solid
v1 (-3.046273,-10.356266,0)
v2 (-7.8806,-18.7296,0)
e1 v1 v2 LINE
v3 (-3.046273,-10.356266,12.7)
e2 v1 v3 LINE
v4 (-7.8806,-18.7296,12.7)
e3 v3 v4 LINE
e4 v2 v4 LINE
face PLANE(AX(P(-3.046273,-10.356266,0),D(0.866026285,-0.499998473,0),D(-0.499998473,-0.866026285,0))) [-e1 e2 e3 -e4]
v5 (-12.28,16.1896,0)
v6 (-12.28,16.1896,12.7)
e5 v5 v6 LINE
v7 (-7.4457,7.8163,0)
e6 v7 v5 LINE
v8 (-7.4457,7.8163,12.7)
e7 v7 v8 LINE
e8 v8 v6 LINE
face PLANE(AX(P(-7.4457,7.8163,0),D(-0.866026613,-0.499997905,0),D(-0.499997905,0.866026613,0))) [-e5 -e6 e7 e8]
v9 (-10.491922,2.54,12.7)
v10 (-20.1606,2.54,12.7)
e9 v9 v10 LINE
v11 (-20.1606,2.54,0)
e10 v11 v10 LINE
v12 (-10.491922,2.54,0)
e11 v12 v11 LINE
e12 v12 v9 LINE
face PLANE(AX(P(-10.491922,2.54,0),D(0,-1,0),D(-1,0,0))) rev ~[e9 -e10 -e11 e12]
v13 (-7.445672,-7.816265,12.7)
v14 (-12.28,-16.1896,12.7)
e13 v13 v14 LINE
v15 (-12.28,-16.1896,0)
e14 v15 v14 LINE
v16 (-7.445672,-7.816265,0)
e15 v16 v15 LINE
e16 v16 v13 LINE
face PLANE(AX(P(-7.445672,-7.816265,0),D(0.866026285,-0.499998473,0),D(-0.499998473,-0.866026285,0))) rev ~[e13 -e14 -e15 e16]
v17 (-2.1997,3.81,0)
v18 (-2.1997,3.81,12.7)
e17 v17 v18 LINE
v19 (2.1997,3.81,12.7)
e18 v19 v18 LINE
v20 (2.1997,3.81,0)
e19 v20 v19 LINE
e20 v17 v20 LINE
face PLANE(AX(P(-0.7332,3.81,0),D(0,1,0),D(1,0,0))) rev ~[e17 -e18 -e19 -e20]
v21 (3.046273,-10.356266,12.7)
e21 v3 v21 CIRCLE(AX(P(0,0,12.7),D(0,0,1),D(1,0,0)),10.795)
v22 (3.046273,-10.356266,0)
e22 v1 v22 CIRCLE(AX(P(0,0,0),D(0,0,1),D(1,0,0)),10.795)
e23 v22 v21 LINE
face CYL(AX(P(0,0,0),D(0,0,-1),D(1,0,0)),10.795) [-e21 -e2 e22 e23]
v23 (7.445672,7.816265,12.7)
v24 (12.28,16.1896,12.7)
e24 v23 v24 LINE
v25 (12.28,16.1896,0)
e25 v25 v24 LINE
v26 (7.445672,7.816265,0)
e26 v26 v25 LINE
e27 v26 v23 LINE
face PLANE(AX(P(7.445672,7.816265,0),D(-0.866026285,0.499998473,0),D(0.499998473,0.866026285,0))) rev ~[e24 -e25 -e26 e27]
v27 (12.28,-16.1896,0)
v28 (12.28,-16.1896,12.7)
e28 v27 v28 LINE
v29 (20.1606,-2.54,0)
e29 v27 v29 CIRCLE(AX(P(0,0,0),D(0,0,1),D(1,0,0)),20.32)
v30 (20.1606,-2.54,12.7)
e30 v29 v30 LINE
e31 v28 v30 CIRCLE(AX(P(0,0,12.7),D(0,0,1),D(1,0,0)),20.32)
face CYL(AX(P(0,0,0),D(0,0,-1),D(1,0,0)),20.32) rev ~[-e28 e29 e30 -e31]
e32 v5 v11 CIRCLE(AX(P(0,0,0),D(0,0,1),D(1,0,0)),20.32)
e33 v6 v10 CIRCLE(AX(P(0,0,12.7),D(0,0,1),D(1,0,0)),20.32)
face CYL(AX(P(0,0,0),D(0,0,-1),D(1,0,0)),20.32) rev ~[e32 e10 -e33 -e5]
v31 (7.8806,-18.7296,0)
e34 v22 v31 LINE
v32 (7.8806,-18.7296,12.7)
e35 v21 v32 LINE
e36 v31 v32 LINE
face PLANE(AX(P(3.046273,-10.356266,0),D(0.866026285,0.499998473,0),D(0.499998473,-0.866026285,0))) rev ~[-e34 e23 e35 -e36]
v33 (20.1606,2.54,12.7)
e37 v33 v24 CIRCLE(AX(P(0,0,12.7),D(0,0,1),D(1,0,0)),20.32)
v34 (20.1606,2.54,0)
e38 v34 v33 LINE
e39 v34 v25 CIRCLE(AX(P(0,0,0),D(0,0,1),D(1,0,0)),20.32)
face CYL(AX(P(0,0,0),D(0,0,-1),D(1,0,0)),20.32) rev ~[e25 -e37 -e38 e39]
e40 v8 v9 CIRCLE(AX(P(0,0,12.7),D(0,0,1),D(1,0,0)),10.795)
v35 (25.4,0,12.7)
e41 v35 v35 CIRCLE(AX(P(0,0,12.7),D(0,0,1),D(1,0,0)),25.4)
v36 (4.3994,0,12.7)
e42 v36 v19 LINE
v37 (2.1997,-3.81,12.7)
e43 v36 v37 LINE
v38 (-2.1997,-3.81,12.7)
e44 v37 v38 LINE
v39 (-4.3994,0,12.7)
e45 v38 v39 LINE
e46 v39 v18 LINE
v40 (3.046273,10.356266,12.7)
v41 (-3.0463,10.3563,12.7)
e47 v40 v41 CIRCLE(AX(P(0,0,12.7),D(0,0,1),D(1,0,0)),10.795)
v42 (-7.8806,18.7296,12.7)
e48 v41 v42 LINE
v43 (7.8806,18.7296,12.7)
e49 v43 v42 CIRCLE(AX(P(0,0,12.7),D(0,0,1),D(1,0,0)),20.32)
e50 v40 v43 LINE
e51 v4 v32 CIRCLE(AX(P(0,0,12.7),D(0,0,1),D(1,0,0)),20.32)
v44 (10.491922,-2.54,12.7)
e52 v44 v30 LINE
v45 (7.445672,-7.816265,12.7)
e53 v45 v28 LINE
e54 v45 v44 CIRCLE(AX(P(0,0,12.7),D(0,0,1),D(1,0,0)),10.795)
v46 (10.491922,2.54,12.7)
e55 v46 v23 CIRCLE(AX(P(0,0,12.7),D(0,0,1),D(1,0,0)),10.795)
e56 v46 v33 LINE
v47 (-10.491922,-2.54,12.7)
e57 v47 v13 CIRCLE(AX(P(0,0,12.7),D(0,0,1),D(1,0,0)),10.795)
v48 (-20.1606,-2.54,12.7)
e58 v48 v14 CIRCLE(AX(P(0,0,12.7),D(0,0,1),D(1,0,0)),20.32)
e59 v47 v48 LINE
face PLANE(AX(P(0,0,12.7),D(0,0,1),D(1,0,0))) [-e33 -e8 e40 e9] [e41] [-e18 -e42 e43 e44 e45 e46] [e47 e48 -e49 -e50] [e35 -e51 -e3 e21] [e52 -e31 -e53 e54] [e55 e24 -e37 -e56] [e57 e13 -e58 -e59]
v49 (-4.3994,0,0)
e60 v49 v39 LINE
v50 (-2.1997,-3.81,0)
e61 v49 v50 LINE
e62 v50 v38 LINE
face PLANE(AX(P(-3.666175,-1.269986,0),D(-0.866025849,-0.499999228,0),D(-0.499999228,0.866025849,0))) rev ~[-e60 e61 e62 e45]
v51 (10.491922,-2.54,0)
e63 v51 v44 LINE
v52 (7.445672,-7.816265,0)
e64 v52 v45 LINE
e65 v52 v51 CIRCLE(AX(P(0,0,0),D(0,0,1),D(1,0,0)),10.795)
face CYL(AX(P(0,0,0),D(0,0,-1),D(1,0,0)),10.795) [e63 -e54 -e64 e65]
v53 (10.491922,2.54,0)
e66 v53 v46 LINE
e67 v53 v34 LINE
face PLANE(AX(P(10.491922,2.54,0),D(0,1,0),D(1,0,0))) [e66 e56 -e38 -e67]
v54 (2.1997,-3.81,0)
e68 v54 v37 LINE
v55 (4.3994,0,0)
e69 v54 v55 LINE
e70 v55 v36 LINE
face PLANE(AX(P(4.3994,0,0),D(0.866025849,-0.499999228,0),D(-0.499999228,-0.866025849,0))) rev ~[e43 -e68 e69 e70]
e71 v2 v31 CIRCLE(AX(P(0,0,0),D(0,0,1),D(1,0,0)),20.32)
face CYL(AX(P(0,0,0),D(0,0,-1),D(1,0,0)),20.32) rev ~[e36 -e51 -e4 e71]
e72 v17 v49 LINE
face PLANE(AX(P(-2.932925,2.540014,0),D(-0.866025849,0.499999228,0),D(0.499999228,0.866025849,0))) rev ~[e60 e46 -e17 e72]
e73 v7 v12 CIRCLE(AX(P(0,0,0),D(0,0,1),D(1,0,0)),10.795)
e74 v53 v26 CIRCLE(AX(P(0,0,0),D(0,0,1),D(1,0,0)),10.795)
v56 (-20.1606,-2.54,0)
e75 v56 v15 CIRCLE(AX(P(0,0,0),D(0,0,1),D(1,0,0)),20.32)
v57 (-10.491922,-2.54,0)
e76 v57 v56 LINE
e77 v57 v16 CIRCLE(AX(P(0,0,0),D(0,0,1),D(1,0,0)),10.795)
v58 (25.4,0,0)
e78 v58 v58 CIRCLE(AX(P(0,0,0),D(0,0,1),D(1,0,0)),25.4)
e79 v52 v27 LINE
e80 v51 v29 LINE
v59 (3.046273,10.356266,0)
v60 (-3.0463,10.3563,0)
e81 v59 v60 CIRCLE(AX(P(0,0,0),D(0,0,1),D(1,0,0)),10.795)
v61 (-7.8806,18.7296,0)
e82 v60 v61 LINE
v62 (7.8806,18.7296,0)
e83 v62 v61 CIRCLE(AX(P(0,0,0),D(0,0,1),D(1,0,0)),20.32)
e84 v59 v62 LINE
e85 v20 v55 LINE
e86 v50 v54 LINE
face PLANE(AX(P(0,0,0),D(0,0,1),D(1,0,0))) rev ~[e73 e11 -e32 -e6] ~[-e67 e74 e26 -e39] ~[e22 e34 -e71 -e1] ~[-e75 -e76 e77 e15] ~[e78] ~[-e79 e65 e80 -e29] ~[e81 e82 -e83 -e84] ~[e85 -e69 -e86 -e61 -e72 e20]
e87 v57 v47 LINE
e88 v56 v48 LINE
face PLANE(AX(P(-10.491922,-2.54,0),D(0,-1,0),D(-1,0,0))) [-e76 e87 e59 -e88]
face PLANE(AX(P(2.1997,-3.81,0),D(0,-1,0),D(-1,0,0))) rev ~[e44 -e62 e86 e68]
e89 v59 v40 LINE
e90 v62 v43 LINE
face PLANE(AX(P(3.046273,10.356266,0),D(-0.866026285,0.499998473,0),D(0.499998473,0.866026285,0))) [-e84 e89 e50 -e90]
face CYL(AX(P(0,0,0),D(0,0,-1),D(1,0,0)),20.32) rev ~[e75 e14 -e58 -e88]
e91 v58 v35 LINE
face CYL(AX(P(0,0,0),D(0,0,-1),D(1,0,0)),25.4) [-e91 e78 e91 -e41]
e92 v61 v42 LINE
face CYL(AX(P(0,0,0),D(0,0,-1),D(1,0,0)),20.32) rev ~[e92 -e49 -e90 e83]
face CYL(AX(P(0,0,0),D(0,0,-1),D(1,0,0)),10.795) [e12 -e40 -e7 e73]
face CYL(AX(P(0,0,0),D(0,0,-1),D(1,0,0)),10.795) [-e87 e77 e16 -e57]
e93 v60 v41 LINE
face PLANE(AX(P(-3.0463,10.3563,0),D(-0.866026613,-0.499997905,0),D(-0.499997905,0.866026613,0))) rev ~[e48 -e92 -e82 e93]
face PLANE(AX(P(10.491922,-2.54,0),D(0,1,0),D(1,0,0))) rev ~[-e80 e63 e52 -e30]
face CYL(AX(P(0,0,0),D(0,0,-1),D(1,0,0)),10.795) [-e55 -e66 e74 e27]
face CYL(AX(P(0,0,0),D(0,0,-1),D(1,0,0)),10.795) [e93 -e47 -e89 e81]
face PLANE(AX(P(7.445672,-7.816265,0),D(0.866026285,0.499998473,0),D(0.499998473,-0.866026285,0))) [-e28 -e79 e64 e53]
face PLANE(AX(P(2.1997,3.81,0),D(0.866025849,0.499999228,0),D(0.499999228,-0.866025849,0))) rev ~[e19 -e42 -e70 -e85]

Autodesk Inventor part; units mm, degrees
ref_plane "YZ Plane" through (0, 0, 0) normal (1, 0, 0) x (0, 1, 0)
ref_plane "XZ Plane" through (0, 0, 0) normal (0, 1, 0) x (-1, 0, 0)
ref_plane "XY Plane" through (0, 0, 0) normal (0, 0, 1) x (1, 0, 0)
sketch "Sketch1" plane through (0, 0, 0) normal (0, 0, 1) x (1, 0, 0)
  line L0 (2.1997, 3.81) -> (4.3994, 0)
  line L1 (4.3994, 0) -> (2.1997, -3.81)
  line L2 (2.1997, -3.81) -> (-2.1997, -3.81)
  line L3 (-2.1997, -3.81) -> (-4.3994, 0)
  line L4 (-4.3994, 0) -> (-2.1997, 3.81)
  line L5 (-2.1997, 3.81) -> (2.1997, 3.81)
  line L6 (0, 0) -> (1.743, 0)
  circle A0 centre (0, 0) radius 10.795
  circle A1 centre (0, 0) radius 25.4
  circle A2 centre (0, 0) radius 20.32
  line L7 (-4.3994, 0) -> (-20.32, 0)
  line L8 (-2.1997, 3.81) -> (-10.16, 17.5976)
  line L9 (2.1997, 3.81) -> (10.16, 17.5976)
  line L10 (4.3994, 0) -> (20.32, 0)
  line L11 (2.1997, -3.81) -> (10.16, -17.5976)
  line L12 (-2.1997, -3.81) -> (-10.16, -17.5976)
  line L13 (-2.9329, 2.54) -> (-20.1606, 2.54)
  line L14 (-2.9329, -2.54) -> (-20.1606, -2.54)
  line L15 (-3.6662, -1.27) -> (-12.28, -16.1896)
  line L16 (0.7332, -3.81) -> (-7.8806, -18.7296)
  line L17 (-0.7332, -3.81) -> (7.8806, -18.7296)
  line L18 (3.6662, -1.27) -> (12.28, -16.1896)
  line L19 (2.9329, 2.54) -> (20.1606, 2.54)
  line L20 (2.9329, -2.54) -> (20.1606, -2.54)
  line L21 (-7.4457, 7.8163) -> (-12.28, 16.1896)
  line L22 (-3.0463, 10.3563) -> (-7.8806, 18.7296)
  line L23 (-0.7332, 3.81) -> (7.8806, 18.7296)
  line L24 (3.6662, 1.27) -> (12.28, 16.1896)
  dimension "d0" = 7.62
  dimension "d1" = 21.59
  dimension "d2" = 50.8
  dimension "d3" = 5.08
  dimension "d4" = 120
  dimension "d5" = 120
  dimension "d6" = 120
  dimension "d7" = 120
  dimension "d8" = 5.08
  dimension "d9" = 2.54
  dimension "d10" = 5.08
  dimension "d11" = 2.54
  dimension "d13" = 2.54
  dimension "d14" = 5.08
  dimension "d15" = 5.08
  dimension "d17" = 2.54
  dimension "d18" = 2.54
  dimension "d19" = 2.54
  dimension "d20" = 5.08
  dimension "d21" = 2.54
extrude "Extrusion1" add sketch "Sketch1" along normal blind 12.7 contours L9 A0 L24 L19 L0 | L5 L23 A0 L9 | L19 L24 L0 | L5 L8 A0 L23 | L9 A2 L24 A0 | A0 L23 A2 L9 | L24 L19 A0 L10 L0 | L24 A0 L19 | L4 L13 A0 L8 | L10 A0 L20 L18 L1 | L19 A2 L10 A0 | L4 L7 A0 L13 | L8 A2 L22 A0 | A0 L21 A2 L8 | L18 L20 L1 | L10 A2 L20 A0 | L3 L15 L14 A0 L7 | A0 L7 A2 L13 | L20 L18 A0 L11 L1 | L20 A0 L18 | L3 L14 L15 | A0 L14 A2 L7 | L11 A0 L17 L16 L2 | L18 A2 L11 A0 | L3 L12 A0 L15 L14 | L15 A0 L14 | L16 L17 L2 | L11 A2 L17 A0 | L2 L17 L16 A0 L12 | A0 L12 A2 L15 | L17 A0 L16 | A0 L16 A2 L12 | A1
equation "\"d5\" = d4"
equation "\"d6\" = d4"
equation "\"d7\" = d4"
properties part number "RobotArm Wheel2"
